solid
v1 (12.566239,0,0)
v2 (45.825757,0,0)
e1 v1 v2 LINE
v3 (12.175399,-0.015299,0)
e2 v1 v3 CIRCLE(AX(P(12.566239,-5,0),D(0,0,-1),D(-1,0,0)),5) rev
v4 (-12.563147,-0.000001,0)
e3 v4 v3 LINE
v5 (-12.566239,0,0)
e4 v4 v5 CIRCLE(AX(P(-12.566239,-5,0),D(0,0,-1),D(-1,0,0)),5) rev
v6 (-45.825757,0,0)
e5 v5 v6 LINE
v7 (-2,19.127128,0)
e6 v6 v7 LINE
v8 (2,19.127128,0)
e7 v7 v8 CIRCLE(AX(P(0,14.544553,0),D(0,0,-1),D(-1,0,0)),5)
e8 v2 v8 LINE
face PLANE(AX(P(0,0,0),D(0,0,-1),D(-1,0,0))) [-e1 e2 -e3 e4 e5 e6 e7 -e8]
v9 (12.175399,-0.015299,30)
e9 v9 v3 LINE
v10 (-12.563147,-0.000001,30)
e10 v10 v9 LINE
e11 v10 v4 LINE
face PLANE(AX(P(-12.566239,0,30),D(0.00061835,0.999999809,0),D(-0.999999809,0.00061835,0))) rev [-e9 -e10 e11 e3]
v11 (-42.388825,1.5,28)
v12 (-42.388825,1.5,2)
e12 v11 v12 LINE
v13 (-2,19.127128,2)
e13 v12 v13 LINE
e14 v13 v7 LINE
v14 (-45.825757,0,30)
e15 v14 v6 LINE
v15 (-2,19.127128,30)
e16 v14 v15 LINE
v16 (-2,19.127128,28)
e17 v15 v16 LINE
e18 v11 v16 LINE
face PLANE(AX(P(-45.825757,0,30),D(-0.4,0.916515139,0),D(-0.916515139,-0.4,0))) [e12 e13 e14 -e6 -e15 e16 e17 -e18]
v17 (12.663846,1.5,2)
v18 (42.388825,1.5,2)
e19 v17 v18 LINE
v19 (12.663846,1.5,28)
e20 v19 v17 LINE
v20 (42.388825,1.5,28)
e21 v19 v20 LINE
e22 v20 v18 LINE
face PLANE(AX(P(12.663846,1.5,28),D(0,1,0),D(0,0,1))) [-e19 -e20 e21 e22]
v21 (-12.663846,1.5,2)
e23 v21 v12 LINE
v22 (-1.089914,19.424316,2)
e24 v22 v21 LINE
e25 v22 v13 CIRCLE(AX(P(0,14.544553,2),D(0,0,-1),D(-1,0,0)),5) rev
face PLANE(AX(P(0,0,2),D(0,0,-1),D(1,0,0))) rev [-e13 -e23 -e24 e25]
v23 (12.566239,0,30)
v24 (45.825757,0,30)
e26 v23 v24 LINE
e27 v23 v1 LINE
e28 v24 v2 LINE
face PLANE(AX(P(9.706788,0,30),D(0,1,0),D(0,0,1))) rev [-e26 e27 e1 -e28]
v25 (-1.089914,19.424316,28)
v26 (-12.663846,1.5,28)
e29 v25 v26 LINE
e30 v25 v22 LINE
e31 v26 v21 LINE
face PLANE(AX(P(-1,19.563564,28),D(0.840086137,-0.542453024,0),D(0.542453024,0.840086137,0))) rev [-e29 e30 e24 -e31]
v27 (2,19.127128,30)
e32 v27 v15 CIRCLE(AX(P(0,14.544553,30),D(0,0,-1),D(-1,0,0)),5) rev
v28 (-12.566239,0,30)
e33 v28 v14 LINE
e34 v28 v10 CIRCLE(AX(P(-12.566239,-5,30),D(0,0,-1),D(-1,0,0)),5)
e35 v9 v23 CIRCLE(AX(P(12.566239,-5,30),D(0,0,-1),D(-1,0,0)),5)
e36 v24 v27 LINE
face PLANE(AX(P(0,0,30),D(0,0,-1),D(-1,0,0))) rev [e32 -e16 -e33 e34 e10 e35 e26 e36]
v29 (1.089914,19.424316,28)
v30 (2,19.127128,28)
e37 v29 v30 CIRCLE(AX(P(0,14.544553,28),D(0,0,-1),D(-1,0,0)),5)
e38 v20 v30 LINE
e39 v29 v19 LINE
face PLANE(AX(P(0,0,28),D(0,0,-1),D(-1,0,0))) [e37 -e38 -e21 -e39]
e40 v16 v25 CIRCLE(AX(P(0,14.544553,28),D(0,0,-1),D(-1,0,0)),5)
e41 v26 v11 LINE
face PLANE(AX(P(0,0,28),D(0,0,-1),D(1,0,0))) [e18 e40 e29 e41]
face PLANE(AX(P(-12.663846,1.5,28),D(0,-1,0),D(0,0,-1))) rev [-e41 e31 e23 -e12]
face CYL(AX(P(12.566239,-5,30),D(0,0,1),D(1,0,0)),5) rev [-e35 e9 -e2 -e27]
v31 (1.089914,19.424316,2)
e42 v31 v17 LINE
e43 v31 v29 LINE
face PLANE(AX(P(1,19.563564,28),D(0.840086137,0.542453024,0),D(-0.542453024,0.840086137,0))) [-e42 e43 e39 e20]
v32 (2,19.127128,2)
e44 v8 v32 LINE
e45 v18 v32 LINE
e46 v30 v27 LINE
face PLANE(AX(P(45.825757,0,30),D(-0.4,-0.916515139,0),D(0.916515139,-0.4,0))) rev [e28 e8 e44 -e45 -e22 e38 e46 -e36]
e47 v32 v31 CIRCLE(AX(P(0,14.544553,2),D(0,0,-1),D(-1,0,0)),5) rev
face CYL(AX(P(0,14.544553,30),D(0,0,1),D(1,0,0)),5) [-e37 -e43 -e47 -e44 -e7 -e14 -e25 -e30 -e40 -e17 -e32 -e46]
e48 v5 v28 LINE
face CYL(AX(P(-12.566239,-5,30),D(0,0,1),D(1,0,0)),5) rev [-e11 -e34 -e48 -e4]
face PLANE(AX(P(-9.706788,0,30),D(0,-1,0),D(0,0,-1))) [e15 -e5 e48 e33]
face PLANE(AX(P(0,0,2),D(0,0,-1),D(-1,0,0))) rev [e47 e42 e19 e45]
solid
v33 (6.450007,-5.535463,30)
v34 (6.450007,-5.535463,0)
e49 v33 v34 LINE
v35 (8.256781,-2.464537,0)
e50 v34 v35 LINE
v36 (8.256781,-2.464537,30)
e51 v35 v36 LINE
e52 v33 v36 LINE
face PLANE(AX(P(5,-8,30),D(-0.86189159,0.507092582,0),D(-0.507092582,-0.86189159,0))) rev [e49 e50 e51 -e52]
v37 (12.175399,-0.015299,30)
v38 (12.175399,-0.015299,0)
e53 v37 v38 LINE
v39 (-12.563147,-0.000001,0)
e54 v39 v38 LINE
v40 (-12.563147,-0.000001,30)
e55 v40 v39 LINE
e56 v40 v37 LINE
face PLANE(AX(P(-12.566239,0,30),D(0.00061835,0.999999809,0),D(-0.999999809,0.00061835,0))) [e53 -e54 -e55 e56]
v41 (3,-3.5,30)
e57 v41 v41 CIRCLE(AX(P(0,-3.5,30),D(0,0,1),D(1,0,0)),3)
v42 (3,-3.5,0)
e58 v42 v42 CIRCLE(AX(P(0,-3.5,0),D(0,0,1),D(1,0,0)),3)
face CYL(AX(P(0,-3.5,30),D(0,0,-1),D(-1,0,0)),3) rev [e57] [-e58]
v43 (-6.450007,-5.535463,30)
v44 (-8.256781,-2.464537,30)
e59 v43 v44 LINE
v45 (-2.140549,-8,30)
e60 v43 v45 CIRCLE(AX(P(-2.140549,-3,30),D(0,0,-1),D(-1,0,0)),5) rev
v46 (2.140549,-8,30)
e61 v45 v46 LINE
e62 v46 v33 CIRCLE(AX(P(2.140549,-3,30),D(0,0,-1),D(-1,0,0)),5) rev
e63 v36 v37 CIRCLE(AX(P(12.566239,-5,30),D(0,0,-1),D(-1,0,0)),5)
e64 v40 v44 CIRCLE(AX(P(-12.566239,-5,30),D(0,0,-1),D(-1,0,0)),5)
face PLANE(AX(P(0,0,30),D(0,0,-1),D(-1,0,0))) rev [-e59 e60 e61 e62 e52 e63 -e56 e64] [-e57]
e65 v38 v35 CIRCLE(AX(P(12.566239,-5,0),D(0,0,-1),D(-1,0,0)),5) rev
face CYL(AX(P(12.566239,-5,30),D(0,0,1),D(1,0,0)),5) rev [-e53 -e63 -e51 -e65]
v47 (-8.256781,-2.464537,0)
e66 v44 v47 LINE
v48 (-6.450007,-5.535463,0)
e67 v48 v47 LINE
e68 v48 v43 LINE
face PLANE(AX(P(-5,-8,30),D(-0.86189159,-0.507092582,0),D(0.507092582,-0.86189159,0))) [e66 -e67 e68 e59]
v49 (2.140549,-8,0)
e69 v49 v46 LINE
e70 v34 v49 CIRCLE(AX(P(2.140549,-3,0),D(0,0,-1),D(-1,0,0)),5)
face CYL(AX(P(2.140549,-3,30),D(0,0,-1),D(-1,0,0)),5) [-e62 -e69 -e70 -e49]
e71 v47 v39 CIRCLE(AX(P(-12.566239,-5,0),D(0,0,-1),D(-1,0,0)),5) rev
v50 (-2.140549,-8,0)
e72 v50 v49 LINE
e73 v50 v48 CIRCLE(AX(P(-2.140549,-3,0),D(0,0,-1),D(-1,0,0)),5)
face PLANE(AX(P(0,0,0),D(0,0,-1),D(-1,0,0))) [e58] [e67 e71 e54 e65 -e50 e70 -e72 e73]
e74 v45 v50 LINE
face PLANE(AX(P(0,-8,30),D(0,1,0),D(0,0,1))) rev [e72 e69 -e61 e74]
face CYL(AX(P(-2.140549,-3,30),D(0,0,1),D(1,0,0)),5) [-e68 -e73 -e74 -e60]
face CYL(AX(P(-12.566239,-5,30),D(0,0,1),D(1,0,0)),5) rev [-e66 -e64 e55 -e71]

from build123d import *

# Parameters (mm, degrees)
BOSS_EXTRU_1_DEPTH         = 30
ENL_V_MAT_EXTRU_1_DEPTH    = 26
CONG_1_R                   = 5
CONG_2_R                   = 5
CONG_1_OF_SYM_TRIE1_R      = 5
CONG_2_OF_SYM_TRIE1_R      = 5
CONG_3_R                   = 5
ESQUISSE7_R                = 3
ENL_V_MAT_EXTRU_2_DEPTH    = 30
SURFACE_EXTRUSION1_1_BACK  = 40
SURFACE_EXTRUSION1_1_DEPTH = 40
SURFACE_EXTRUSION1_2_BACK  = 40
SURFACE_EXTRUSION1_2_DEPTH = 40


with BuildPart() as part:
    # Esquisse1 → Boss.-Extru.1 (new body)
    with BuildSketch(Plane.XY):
        Polygon((0, -8), (5, -8), (9.70678761, 0), (45.82575695, 0), (0, 20), align=None)
    boss_extru_1 = extrude(amount=BOSS_EXTRU_1_DEPTH)

    # Esquisse3 → Enlèv. mat.-Extru.1 (cut)
    with BuildSketch(Plane.XY.offset(2)):
        Polygon((1, 19.56356422), (12.66384565, 1.5), (42.388825178, 1.5), align=None)
    enl_v_mat_extru_1 = extrude(amount=ENL_V_MAT_EXTRU_1_DEPTH, mode=Mode.SUBTRACT)

    # Congé1
    cong_1_edges = [part.edges().sort_by_distance(p)[0] for p in [
        (5, -8, 15),
    ]]
    fillet(cong_1_edges, radius=CONG_1_R)

    # Congé2
    cong_2_edges = [part.edges().sort_by_distance(p)[0] for p in [
        (9.70678761, 0, 15),
    ]]
    fillet(cong_2_edges, radius=CONG_2_R)

    # Symétrie1: Boss.-Extru.1, Enlèv. mat.-Extru.1 across plane
    add(boss_extru_1.mirror(Plane(origin=(0, 0, 0), x_dir=(0, 0, 1), z_dir=(1, 0, 0))))
    add(enl_v_mat_extru_1.mirror(Plane(origin=(0, 0, 0), x_dir=(0, 0, 1), z_dir=(1, 0, 0))), mode=Mode.SUBTRACT)

    # Congé1 of Symétrie1
    cong_1_of_sym_trie1_edges = [part.edges().sort_by_distance(p)[0] for p in [
        (-5, -8, 15),
    ]]
    fillet(cong_1_of_sym_trie1_edges, radius=CONG_1_OF_SYM_TRIE1_R)

    # Congé2 of Symétrie1
    cong_2_of_sym_trie1_edges = [part.edges().sort_by_distance(p)[0] for p in [
        (-9.70678761, 0, 15),
    ]]
    fillet(cong_2_of_sym_trie1_edges, radius=CONG_2_OF_SYM_TRIE1_R)

    # Congé3
    # the kernel refuses this fillet: 5 mm, written as the material it takes off along each edge
    with BuildSketch(Plane(origin=(0, 20, -5.455447256), x_dir=(-0.9165151389911679, -0.4000000000000003, 0), z_dir=(0, 0, 1))) as cong_3_piece_1:
        with BuildLine():
            CenterArc((CONG_3_R * 0.436435780472, CONG_3_R), CONG_3_R, 222.843643044, 47.156356956)
            Line((-CONG_3_R * 0.296776330721, CONG_3_R * 0.32), (0, 0))
            Line((0, 0), (CONG_3_R * 0.436435780472, 0))
        make_face()
    extrude(amount=40.910894512, mode=Mode.SUBTRACT)

    # Esquisse7 → Enlèv. mat.-Extru.2 (cut)
    with BuildSketch(Plane.XY):
        with Locations((0, -3.5)):
            Circle(ESQUISSE7_R)
    extrude(amount=ENL_V_MAT_EXTRU_2_DEPTH, mode=Mode.SUBTRACT)


with BuildPart() as body_2:
    # Fractionner1: the piece behind the surface
    add(part.part)
    # Surface-Extrusion1: a surface, the sketch's curves swept straight by 40 mm
    with BuildLine(Plane.XY.offset(30).offset(-SURFACE_EXTRUSION1_1_BACK), mode=Mode.PRIVATE) as surface_extrusion1_1_path:
        Line((-12.566238981, 0), (12.17539903, -0.015298993))
    surface_extrusion1_1 = Shell.extrude(surface_extrusion1_1_path.wire(), (0 * SURFACE_EXTRUSION1_1_DEPTH, 0 * SURFACE_EXTRUSION1_1_DEPTH, 1 * SURFACE_EXTRUSION1_1_DEPTH))
    split(bisect_by=surface_extrusion1_1, keep=Keep.BOTTOM)


with BuildPart() as part_1:
    add(part.part)

    # Fractionner1: split by a surface, the side it looks to stays
    # Surface-Extrusion1: a surface, the sketch's curves swept straight by 40 mm
    with BuildLine(Plane.XY.offset(30).offset(-SURFACE_EXTRUSION1_2_BACK), mode=Mode.PRIVATE) as surface_extrusion1_2_path:
        Line((-12.566238981, 0), (12.17539903, -0.015298993))
    surface_extrusion1_2 = Shell.extrude(surface_extrusion1_2_path.wire(), (0 * SURFACE_EXTRUSION1_2_DEPTH, 0 * SURFACE_EXTRUSION1_2_DEPTH, 1 * SURFACE_EXTRUSION1_2_DEPTH))
    split(bisect_by=surface_extrusion1_2, keep=Keep.TOP)


solid = Compound([body_2.part, part_1.part])
